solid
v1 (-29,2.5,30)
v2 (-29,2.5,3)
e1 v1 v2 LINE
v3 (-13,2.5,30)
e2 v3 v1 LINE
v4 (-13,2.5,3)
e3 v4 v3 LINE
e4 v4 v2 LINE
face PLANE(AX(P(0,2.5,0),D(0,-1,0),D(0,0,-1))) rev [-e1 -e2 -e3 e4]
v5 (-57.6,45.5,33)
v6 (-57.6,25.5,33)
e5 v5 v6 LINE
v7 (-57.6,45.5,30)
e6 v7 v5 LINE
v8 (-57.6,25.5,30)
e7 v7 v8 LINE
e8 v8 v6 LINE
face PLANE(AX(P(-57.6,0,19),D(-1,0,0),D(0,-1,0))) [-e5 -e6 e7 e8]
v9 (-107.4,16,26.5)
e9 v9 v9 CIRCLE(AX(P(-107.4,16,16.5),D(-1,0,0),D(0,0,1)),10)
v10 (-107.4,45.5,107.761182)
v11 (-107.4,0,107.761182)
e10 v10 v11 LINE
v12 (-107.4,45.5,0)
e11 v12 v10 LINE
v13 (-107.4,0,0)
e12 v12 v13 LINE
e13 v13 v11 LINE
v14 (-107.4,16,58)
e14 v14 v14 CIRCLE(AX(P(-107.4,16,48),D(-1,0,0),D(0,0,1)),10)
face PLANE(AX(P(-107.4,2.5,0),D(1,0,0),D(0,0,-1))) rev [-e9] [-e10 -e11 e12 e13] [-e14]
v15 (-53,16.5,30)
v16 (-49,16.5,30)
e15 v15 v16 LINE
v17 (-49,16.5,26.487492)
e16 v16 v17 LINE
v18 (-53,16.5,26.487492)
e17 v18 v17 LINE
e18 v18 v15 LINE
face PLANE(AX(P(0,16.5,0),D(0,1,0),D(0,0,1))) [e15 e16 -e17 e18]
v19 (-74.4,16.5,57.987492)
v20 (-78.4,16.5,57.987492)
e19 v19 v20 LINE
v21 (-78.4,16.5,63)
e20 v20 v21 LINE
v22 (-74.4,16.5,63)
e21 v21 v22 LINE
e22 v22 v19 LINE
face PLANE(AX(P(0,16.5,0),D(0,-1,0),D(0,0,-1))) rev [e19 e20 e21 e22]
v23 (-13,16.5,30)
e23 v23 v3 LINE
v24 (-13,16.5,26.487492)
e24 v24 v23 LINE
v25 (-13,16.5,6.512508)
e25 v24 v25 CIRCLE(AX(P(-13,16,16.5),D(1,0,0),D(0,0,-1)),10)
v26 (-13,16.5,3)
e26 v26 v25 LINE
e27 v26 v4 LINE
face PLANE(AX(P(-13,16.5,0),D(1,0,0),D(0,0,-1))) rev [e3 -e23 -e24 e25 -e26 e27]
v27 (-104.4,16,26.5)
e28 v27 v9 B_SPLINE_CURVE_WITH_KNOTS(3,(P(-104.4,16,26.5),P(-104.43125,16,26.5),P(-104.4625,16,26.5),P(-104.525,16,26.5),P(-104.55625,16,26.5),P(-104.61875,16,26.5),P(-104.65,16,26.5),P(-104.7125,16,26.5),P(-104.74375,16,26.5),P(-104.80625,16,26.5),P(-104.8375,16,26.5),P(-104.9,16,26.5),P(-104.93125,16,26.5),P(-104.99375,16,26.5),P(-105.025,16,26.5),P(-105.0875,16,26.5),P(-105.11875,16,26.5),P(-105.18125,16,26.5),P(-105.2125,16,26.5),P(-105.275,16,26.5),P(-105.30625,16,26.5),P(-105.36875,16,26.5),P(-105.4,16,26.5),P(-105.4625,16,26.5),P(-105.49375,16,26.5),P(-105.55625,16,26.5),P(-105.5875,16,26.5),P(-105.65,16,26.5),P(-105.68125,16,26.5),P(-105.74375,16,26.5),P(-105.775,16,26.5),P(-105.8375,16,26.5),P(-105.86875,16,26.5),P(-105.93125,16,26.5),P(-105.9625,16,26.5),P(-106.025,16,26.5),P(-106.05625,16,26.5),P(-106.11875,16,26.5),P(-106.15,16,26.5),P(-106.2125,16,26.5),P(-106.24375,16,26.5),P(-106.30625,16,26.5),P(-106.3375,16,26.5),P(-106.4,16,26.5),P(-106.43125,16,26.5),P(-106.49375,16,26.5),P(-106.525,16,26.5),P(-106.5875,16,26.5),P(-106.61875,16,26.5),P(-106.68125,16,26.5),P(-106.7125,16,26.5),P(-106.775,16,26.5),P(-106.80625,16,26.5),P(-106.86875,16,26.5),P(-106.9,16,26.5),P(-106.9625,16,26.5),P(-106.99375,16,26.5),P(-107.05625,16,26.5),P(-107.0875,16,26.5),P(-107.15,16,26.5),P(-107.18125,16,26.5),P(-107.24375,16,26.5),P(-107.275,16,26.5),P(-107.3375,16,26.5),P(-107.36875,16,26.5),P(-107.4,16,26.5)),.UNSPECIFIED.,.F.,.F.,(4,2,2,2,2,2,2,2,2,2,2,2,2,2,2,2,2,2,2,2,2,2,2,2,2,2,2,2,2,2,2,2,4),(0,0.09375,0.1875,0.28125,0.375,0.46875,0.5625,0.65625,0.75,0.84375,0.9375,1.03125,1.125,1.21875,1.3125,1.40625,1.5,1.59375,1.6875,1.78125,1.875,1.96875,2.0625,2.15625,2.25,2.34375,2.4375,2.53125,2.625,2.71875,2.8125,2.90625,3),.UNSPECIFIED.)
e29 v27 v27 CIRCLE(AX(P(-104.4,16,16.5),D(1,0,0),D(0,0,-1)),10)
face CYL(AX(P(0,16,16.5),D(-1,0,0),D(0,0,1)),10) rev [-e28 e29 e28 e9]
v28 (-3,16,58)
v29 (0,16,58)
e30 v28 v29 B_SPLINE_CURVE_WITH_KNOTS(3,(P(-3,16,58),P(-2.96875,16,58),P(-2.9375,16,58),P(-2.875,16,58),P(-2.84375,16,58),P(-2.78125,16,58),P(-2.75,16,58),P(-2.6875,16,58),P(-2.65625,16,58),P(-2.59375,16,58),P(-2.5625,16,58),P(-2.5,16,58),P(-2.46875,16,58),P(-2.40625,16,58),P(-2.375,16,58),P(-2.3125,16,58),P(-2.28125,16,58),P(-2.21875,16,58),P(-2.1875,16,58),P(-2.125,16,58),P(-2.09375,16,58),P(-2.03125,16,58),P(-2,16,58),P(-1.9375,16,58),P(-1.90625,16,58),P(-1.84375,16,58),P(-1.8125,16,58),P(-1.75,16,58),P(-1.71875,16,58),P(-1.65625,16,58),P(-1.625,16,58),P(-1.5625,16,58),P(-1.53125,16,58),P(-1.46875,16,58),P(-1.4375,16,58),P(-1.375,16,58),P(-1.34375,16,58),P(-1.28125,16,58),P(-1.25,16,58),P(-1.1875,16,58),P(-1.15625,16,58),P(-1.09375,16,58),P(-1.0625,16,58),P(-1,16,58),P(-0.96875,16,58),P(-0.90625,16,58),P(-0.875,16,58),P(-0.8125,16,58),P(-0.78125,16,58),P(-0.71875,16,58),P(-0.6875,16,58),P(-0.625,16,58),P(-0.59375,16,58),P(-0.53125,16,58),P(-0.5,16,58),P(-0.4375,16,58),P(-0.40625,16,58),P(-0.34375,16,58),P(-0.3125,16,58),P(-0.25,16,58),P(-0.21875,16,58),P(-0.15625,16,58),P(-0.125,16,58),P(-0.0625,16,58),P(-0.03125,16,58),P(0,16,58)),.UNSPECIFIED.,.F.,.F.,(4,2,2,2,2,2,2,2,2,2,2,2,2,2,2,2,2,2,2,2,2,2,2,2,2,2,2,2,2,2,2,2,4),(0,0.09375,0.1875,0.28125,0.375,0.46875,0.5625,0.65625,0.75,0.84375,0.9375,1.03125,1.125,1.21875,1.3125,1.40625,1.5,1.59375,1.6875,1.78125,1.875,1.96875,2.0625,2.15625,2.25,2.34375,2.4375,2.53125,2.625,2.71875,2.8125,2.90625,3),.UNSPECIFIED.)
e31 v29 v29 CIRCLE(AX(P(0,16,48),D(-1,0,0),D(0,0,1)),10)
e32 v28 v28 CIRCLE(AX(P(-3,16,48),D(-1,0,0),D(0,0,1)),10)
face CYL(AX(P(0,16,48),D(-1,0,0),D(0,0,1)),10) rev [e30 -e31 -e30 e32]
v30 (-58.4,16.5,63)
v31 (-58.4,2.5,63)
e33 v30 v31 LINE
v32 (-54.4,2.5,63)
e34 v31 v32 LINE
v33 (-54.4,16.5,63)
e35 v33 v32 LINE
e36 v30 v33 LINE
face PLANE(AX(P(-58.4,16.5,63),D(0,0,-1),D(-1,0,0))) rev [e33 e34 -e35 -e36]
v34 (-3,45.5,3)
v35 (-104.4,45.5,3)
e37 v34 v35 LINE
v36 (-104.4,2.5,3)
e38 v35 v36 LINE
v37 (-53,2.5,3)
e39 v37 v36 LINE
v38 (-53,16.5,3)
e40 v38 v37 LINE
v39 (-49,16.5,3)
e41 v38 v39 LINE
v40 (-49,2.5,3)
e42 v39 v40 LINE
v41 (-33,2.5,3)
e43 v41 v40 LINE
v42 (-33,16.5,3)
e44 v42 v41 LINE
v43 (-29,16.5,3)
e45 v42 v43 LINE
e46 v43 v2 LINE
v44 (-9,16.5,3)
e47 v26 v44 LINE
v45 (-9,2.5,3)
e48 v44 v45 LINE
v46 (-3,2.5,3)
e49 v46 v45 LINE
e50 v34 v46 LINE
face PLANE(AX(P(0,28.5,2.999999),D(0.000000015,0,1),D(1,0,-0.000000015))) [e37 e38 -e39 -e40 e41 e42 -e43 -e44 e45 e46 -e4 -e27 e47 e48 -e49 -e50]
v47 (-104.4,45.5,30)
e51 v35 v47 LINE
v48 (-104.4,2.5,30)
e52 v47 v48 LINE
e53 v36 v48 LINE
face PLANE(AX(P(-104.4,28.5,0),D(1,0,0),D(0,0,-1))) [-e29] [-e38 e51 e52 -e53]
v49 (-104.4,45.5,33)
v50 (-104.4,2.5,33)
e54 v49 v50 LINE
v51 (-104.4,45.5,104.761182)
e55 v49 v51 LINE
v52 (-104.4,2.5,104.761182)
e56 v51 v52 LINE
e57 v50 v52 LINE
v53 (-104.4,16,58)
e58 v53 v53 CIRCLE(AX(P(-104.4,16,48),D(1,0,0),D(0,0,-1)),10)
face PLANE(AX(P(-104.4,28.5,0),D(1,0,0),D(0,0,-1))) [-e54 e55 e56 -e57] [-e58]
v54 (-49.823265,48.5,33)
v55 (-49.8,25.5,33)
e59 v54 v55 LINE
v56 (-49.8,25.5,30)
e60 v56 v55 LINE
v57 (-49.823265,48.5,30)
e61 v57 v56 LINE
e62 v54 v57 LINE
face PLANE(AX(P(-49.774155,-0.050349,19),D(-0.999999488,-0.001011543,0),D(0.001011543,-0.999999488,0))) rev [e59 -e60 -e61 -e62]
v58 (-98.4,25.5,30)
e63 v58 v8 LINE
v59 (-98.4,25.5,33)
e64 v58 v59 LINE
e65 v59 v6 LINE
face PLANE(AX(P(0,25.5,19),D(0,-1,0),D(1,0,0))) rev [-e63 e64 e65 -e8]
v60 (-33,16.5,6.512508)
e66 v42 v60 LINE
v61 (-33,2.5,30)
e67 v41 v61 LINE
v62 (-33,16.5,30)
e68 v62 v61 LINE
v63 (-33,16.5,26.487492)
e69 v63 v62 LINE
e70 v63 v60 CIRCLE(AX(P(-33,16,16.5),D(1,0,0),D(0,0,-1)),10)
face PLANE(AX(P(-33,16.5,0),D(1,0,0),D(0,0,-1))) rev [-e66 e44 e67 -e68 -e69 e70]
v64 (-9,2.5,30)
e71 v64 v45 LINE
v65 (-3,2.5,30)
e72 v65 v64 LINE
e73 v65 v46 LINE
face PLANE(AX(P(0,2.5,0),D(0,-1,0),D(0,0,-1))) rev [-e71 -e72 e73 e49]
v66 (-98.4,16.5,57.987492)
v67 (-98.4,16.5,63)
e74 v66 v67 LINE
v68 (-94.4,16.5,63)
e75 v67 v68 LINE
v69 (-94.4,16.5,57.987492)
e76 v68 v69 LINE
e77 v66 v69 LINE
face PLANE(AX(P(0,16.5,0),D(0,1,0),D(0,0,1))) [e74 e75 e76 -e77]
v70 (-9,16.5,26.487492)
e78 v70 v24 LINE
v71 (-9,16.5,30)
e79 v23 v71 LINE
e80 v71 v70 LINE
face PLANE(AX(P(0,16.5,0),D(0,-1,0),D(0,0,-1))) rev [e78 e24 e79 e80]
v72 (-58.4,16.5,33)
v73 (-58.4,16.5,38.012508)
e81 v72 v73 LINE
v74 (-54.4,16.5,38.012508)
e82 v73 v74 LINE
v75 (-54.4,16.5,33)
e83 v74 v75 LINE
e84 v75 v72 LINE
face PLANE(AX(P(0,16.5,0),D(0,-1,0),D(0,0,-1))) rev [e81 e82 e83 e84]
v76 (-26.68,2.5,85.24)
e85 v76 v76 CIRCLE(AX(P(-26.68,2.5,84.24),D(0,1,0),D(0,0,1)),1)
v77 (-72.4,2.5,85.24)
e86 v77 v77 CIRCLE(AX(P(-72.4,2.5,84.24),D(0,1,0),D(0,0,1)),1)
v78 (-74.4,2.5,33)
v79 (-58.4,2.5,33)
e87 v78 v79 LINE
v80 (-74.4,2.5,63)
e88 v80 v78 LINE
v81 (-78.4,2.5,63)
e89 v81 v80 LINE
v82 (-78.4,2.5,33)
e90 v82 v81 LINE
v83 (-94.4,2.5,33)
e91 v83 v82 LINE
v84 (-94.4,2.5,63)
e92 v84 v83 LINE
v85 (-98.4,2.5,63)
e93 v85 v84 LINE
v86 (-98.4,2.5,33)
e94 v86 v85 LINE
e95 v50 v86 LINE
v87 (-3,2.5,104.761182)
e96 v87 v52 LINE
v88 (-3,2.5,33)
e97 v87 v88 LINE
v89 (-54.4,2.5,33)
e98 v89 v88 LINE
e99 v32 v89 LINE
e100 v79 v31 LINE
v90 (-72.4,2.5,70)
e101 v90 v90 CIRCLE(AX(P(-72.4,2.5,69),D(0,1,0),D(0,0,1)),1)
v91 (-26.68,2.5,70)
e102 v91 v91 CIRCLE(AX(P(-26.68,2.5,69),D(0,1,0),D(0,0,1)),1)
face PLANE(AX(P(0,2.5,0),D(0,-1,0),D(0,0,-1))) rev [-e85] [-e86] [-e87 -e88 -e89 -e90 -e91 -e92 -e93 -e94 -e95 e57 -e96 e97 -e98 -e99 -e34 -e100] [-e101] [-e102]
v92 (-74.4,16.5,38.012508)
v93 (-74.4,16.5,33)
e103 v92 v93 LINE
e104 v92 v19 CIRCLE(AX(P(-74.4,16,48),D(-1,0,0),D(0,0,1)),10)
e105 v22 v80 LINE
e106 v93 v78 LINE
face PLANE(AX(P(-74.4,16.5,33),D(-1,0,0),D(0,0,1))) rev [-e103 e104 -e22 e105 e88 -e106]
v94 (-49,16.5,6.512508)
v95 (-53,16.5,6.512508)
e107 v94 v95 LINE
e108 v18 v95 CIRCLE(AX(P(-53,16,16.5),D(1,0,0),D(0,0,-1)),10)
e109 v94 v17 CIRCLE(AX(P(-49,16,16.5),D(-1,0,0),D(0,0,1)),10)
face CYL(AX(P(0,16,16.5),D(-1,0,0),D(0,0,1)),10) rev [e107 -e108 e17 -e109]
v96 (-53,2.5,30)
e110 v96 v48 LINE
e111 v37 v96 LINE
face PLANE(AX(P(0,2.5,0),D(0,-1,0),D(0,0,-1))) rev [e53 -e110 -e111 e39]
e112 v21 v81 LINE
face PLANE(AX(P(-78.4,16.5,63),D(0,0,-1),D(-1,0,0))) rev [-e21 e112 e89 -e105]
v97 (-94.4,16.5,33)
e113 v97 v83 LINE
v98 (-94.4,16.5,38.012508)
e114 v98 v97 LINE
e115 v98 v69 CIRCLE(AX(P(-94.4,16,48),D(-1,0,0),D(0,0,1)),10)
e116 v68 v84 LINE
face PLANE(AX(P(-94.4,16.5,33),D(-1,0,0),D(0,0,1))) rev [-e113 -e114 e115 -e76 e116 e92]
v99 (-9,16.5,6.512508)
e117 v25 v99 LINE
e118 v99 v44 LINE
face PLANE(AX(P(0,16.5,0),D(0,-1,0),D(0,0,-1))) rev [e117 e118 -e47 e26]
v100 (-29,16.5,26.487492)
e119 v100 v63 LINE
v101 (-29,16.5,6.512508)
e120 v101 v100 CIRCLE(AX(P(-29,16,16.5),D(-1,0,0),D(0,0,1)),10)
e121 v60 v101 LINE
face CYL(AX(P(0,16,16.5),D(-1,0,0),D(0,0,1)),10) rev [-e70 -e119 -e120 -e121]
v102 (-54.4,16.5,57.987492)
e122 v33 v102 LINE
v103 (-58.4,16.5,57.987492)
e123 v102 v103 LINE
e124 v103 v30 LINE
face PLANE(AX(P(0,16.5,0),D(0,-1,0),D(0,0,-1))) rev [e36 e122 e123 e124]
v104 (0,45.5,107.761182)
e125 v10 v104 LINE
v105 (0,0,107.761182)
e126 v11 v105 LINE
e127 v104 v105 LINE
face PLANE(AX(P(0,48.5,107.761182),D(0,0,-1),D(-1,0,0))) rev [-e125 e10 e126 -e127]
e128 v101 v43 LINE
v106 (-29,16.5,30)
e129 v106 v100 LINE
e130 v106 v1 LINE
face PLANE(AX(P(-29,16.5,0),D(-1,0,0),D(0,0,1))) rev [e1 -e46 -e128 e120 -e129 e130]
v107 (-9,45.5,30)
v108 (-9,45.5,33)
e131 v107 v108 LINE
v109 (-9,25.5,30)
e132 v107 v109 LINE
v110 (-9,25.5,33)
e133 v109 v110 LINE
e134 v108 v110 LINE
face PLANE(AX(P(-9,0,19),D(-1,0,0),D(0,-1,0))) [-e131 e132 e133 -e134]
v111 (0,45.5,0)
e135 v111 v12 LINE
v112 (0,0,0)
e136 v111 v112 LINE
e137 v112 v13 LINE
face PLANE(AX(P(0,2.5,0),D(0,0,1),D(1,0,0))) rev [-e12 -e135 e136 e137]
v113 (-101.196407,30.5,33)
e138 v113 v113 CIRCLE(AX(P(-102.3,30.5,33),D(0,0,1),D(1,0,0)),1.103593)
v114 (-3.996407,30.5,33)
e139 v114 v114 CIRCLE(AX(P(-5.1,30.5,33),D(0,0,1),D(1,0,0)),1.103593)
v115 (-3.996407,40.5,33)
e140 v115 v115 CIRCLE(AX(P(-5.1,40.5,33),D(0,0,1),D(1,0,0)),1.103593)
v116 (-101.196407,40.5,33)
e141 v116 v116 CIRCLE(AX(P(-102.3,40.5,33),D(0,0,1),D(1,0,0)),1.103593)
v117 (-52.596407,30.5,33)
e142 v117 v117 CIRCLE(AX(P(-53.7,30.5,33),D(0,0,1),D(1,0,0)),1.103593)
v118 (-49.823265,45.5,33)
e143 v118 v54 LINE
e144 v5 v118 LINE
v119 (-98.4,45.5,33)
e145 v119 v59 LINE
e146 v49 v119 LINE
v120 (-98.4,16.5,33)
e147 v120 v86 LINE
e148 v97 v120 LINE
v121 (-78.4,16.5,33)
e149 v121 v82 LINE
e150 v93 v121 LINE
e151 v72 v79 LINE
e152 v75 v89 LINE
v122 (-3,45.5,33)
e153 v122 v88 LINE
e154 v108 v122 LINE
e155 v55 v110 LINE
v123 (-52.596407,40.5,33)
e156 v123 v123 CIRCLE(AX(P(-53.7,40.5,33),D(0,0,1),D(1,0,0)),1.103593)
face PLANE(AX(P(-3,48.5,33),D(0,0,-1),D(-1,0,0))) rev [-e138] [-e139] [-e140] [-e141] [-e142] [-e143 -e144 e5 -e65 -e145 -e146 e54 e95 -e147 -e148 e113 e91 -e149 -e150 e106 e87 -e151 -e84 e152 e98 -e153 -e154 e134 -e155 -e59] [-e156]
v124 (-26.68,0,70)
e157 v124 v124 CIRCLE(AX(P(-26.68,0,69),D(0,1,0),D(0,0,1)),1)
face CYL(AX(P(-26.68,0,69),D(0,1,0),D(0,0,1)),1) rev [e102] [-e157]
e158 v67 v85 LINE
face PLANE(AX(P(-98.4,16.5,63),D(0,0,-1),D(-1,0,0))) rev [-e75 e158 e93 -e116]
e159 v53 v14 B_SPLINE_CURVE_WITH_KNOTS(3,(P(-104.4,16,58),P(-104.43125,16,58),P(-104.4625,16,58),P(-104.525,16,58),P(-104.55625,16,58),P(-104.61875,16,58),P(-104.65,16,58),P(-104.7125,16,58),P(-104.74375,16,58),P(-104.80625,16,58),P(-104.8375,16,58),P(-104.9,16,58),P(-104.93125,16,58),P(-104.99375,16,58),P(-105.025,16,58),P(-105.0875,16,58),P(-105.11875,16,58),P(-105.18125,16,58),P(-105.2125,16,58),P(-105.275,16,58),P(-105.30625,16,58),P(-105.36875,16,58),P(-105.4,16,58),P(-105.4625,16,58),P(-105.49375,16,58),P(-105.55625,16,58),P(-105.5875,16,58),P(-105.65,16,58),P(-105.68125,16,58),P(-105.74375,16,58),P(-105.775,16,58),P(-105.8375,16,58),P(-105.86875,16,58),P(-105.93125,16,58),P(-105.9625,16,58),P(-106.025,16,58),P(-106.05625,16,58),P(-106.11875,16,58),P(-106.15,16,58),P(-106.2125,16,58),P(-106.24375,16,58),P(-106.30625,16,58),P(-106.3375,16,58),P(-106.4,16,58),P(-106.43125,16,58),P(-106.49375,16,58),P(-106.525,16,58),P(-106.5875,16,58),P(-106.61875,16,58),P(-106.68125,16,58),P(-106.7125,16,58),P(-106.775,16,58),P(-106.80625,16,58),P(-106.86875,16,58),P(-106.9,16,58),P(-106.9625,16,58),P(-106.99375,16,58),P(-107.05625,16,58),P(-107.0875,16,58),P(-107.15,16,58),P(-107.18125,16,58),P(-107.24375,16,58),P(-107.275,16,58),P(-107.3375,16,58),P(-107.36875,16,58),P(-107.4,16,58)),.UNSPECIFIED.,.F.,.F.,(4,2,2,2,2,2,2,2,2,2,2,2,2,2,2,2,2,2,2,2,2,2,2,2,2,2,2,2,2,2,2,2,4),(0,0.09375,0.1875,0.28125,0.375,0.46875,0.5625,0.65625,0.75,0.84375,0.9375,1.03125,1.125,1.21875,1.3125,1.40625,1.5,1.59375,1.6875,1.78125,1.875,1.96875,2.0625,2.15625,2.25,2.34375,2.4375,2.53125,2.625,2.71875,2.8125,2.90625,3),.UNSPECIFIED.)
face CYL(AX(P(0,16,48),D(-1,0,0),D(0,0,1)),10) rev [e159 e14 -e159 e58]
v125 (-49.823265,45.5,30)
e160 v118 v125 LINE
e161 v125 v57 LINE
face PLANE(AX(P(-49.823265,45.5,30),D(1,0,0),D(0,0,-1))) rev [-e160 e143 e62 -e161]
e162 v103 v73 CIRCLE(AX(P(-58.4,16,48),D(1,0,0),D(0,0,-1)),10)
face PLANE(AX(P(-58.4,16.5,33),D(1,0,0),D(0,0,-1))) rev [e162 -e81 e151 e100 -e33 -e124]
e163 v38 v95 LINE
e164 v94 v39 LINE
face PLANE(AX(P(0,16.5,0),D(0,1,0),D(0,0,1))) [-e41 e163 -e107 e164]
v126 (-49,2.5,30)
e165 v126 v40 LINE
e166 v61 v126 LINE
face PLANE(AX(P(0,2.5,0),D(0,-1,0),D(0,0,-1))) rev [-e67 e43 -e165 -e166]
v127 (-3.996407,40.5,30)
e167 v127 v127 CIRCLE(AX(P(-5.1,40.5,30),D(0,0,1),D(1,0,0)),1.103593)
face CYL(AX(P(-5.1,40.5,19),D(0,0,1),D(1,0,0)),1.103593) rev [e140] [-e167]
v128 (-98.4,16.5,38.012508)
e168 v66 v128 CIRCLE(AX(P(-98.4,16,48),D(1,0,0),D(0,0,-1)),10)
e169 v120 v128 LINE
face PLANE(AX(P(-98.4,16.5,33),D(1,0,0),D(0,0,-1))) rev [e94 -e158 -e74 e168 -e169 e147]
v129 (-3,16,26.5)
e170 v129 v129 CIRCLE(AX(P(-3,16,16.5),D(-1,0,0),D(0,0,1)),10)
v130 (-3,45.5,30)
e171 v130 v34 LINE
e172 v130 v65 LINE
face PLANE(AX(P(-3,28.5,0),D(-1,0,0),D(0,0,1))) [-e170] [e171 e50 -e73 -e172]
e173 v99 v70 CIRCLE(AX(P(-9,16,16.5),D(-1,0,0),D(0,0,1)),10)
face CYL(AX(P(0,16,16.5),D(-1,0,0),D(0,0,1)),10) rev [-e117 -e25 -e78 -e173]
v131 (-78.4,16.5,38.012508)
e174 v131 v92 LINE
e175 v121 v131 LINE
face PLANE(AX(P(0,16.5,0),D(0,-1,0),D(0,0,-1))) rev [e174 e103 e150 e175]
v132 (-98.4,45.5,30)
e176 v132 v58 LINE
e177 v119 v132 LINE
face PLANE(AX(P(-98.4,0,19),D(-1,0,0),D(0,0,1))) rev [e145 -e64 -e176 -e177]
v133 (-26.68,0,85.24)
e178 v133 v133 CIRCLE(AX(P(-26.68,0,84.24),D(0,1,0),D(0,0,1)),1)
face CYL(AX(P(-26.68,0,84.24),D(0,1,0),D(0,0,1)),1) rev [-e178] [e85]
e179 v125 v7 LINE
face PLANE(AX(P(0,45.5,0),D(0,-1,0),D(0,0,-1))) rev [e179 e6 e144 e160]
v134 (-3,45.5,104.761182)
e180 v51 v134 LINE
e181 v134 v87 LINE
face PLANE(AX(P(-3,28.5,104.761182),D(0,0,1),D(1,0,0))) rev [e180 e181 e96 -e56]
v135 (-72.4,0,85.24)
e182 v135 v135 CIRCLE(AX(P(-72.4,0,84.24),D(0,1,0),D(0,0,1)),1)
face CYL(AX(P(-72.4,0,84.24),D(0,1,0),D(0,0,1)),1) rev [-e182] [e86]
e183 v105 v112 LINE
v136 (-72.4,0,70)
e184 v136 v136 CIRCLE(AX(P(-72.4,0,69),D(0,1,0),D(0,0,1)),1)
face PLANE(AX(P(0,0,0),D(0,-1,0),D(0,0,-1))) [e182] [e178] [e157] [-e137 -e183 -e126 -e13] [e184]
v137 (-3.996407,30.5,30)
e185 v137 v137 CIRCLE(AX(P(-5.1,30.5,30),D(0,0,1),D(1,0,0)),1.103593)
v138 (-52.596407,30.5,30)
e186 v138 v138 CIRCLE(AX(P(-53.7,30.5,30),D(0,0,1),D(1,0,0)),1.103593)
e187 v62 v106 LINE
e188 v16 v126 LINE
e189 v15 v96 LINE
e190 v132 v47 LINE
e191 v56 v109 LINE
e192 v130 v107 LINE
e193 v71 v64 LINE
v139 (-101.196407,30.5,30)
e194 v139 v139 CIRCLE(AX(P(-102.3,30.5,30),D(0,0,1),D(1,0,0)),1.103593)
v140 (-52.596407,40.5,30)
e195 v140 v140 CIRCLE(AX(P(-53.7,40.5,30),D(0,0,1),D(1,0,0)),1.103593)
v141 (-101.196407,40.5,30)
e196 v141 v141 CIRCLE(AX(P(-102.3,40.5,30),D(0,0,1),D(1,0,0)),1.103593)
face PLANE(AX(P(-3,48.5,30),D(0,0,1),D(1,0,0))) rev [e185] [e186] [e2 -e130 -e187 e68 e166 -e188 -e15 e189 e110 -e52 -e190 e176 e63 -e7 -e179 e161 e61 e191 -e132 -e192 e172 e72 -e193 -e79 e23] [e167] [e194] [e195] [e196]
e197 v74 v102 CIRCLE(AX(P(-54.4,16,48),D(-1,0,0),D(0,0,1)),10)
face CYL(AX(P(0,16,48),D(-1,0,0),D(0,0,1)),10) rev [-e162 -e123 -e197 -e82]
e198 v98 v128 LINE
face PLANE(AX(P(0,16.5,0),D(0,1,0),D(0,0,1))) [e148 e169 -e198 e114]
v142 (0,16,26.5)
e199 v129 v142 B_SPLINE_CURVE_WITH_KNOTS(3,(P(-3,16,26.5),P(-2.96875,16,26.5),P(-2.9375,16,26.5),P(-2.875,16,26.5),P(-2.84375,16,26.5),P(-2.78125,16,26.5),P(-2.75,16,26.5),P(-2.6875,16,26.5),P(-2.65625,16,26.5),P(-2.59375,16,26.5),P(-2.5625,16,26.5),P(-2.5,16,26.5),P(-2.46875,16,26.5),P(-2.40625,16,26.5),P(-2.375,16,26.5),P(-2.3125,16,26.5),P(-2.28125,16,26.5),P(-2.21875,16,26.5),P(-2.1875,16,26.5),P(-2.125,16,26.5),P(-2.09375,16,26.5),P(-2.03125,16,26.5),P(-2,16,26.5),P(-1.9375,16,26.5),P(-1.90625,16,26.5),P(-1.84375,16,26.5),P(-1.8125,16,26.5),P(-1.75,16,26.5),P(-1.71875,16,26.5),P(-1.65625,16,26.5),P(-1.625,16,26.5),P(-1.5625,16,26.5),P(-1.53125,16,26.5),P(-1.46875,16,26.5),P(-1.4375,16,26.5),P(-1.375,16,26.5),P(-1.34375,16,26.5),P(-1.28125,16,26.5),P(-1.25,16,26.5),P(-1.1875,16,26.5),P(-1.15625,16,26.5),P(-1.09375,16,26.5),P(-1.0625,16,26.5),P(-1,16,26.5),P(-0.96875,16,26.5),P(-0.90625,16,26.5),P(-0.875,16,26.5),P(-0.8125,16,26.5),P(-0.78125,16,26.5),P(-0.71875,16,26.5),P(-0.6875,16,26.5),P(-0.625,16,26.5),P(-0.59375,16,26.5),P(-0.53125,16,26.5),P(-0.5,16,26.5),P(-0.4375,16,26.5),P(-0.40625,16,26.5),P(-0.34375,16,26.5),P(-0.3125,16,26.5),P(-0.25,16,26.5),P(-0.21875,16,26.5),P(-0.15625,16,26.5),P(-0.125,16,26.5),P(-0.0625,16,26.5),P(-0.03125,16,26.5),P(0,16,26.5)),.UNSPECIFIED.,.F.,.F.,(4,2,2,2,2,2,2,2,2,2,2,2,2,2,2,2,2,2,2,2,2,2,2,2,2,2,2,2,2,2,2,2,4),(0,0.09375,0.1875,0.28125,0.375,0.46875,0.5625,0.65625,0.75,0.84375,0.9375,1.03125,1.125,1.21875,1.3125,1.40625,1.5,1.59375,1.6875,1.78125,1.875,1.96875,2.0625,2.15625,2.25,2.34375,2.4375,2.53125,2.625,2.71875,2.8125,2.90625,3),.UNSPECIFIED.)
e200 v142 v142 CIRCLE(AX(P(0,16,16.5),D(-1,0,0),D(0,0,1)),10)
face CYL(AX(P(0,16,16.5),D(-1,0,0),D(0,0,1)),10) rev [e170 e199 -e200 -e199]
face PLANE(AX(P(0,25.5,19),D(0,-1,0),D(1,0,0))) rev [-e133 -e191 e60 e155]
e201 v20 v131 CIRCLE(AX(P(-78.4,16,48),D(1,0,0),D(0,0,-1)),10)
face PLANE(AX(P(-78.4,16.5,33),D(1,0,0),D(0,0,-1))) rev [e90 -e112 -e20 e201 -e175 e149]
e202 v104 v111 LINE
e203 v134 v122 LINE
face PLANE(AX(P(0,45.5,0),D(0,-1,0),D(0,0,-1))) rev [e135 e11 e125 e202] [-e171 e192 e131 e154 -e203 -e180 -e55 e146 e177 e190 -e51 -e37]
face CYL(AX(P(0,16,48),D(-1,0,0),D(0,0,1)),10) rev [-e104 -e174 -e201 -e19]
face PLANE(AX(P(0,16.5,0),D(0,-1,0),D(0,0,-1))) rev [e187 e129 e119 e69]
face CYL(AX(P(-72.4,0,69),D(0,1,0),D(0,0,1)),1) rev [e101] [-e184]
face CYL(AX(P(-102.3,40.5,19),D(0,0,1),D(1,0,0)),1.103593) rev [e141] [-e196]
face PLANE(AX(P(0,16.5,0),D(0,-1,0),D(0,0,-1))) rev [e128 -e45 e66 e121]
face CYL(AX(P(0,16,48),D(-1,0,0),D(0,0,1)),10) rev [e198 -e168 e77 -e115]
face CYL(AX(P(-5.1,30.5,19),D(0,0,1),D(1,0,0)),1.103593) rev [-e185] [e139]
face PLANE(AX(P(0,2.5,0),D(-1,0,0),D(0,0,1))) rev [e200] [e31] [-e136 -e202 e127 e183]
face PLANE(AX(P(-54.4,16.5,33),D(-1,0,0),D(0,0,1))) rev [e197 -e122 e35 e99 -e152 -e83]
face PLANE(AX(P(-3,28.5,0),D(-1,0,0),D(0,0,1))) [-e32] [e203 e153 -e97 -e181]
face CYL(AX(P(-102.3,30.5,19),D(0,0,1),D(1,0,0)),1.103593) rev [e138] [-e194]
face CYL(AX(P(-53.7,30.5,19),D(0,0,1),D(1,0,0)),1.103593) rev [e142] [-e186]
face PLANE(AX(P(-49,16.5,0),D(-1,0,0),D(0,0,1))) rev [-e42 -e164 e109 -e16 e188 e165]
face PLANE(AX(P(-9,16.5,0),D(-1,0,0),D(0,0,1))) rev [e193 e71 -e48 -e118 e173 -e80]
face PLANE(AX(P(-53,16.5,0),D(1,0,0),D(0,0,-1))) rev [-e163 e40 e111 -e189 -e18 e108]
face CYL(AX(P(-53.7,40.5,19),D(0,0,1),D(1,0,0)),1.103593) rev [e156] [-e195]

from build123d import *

# Parameters (mm, degrees)
SKETCH3_W           = 107.4
SKETCH3_H           = 136.761182254
BOSS_EXTRUDE2_DEPTH = 2.5
SKETCH4_W           = 4
SKETCH4_H           = 30
BOSS_EXTRUDE3_DEPTH = 14
BOSS_EXTRUDE5_DEPTH = 26
SKETCH8_R           = 1
CUT_EXTRUDE3_DEPTH  = 176.824858798
SKETCH10_W          = 101.4
SKETCH10_H          = 3
BOSS_EXTRUDE6_DEPTH = 46
SKETCH14_W          = 107.4
SKETCH14_H          = 29
CUT_EXTRUDE7_DEPTH  = 181.528753863
SKETCH15_W          = 40.8
SKETCH15_H          = 23
SKETCH15_R          = 1.103593158
CUT_EXTRUDE11_DEPTH = 14
SKETCH17_R          = 10
CUT_EXTRUDE12_DEPTH = 160.685573552
SKETCH18_W          = 101.4
SKETCH18_H          = 3
BOSS_EXTRUDE7_DEPTH = 26
SKETCH19_W          = 4
SKETCH19_H          = 3
SKETCH19_H_2        = 3.000000485
BOSS_EXTRUDE8_DEPTH = 12
SKETCH20_W          = 6
SKETCH20_H          = 3
SKETCH20_W_2        = 7.776734501
CUT_EXTRUDE13_DEPTH = 3
SKETCH21_W          = 107.4
SKETCH21_H          = 107.761182254
SKETCH21_W_2        = 101.4
SKETCH21_H_2        = 101.761182254
BOSS_EXTRUDE9_DEPTH = 17


with BuildPart() as part:
    # Sketch3 → Boss-Extrude2 (new body)
    with BuildSketch(Plane(origin=(0, 0, 0), x_dir=(1, 0, 0), z_dir=(0, 1, 0))):
        with Locations((-53.7, -68.380591127)):
            Rectangle(SKETCH3_W, SKETCH3_H)
    extrude(amount=BOSS_EXTRUDE2_DEPTH)

    # Sketch4 → Boss-Extrude3 (add)
    with BuildSketch(Plane(origin=(0, 2.5, 0), x_dir=(1, 0, 0), z_dir=(0, 1, 0))):
        with Locations((-31, -14.999999758)):
            Rectangle(SKETCH4_W, SKETCH4_H)
        with Locations((-51, -15)):
            Rectangle(SKETCH4_W, SKETCH4_H)
        with Locations((-11, -14.999999515)):
            Rectangle(SKETCH4_W, SKETCH4_H)
        with Locations((-76.4, -48.000000242)):
            Rectangle(SKETCH4_W, SKETCH4_H)
        with Locations((-96.4, -48.000000485)):
            Rectangle(SKETCH4_W, SKETCH4_H)
        with Locations((-56.4, -48)):
            Rectangle(SKETCH4_W, SKETCH4_H)
    extrude(amount=BOSS_EXTRUDE3_DEPTH)

    # Sketch7 → Boss-Extrude5 (add)
    with BuildSketch(Plane(origin=(0, 2.5, 0), x_dir=(1, 0, 0), z_dir=(0, 1, 0))):
        Polygon((-9, -3), (-3, -3), (-3, -133.761182254), (-104.4, -133.761182254), (-104.4, -3), (-53, -3), (-53, 0), (-107.4, 0), (-107.4, -136.761182254), (0, -136.761182254), (0, 0), (-9, 0), align=None)
        Polygon((-28.999999909, -3), (-12.999999909, -2.999999515), (-13, 4.85e-07), (-29, 0), align=None)
        Polygon((-48.999999955, -3), (-32.999999955, -2.999999758), (-33, 2.42e-07), (-49, 0), align=None)
    extrude(amount=BOSS_EXTRUDE5_DEPTH)

    # Sketch8 → Cut-Extrude3 (cut, through all)
    with BuildSketch(Plane(origin=(0, 2.5, 0), x_dir=(1, 0, 0), z_dir=(0, 1, 0))):
        with Locations((-72.4, -69.000000485)):
            Circle(SKETCH8_R)
        with Locations((-26.68, -69.000000485)):
            Circle(SKETCH8_R)
        with Locations((-26.68, -84.240000485)):
            Circle(SKETCH8_R)
        with Locations((-72.4, -84.240000485)):
            Circle(SKETCH8_R)
    extrude(amount=-CUT_EXTRUDE3_DEPTH, mode=Mode.SUBTRACT)


with BuildPart() as boss_extrude6_tool:
    # Sketch10 → Boss-Extrude6 (new body)
    with BuildSketch(Plane(origin=(0, 2.5, 0), x_dir=(1, 0, 0), z_dir=(0, 1, 0))):
        with Locations((-53.7, -31.499999515)):
            Rectangle(SKETCH10_W, SKETCH10_H)
    extrude(amount=BOSS_EXTRUDE6_DEPTH)


with BuildPart() as part_1:
    add(part.part)


with BuildPart() as part_2:
    # Boss-Extrude6: joined with boss_extrude6_tool
    add(part_1.part.fuse(boss_extrude6_tool.part, tol=0.00001))

    # Sketch14 → Cut-Extrude7 (cut, through all)
    with BuildSketch(Plane.XZ):
        with Locations((-53.7, 122.261182254)):
            Rectangle(SKETCH14_W, SKETCH14_H)
    extrude(amount=-CUT_EXTRUDE7_DEPTH, mode=Mode.SUBTRACT)

    # Sketch15 → Cut-Extrude11 (cut)
    with BuildSketch(Plane.XY.offset(32.999999515)):
        with Locations((-78, 37)):
            Rectangle(SKETCH15_W, SKETCH15_H)
        Polygon((-49.823265499, 48.5), (-49.8, 25.5), (-9, 25.5), (-9, 48.5), align=None)
        with Locations((-102.3, 30.5)):
            Circle(SKETCH15_R)
        with Locations((-102.3, 40.5)):
            Circle(SKETCH15_R)
        with Locations((-53.7, 30.5)):
            Circle(SKETCH15_R)
        with Locations((-53.7, 40.5)):
            Circle(SKETCH15_R)
        with Locations((-5.1, 40.5)):
            Circle(SKETCH15_R)
        with Locations((-5.1, 30.5)):
            Circle(SKETCH15_R)
    extrude(amount=-CUT_EXTRUDE11_DEPTH, mode=Mode.SUBTRACT)

    # Sketch17 → Cut-Extrude12 (cut, through all)
    with BuildSketch(Plane.ZY.offset(107.4)):
        with Locations((16.5, 16)):
            Circle(SKETCH17_R)
        with Locations((48, 16)):
            Circle(SKETCH17_R)
    extrude(amount=-CUT_EXTRUDE12_DEPTH, mode=Mode.SUBTRACT)

    # Sketch18 → Boss-Extrude7 (add)
    with BuildSketch(Plane(origin=(0, 2.5, 0), x_dir=(1, 0, 0), z_dir=(0, 1, 0))):
        with Locations((-53.7, -106.261182254)):
            Rectangle(SKETCH18_W, SKETCH18_H)
    extrude(amount=BOSS_EXTRUDE7_DEPTH)

    # Sketch19 → Boss-Extrude8 (add)
    with BuildSketch(Plane(origin=(0, 16.5, 0), x_dir=(1, 0, 0), z_dir=(0, 1, 0))):
        with Locations((-51, -1.5)):
            Rectangle(SKETCH19_W, SKETCH19_H)
        with Locations((-31, -1.5)):
            Rectangle(SKETCH19_W, SKETCH19_H)
        with Locations((-11, -1.499999757)):
            Rectangle(SKETCH19_W, SKETCH19_H_2)
    extrude(amount=BOSS_EXTRUDE8_DEPTH)

    # Sketch20 → Cut-Extrude13 (cut)
    with BuildSketch(Plane(origin=(0, 48.5, 0), x_dir=(1, 0, 0), z_dir=(0, 1, 0))):
        with Locations((-6, -31.499999515)):
            Rectangle(SKETCH20_W, SKETCH20_H)
        with Locations((-53.711632749, -31.499999515)):
            Rectangle(SKETCH20_W_2, SKETCH20_H)
        with Locations((-101.4, -31.499999515)):
            Rectangle(SKETCH20_W, SKETCH20_H)
    extrude(amount=-CUT_EXTRUDE13_DEPTH, mode=Mode.SUBTRACT)

    # Sketch21 → Boss-Extrude9 (add)
    with BuildSketch(Plane(origin=(0, 28.5, 0), x_dir=(1, 0, 0), z_dir=(0, 1, 0))):
        with Locations((-53.7, -53.880591127)):
            Rectangle(SKETCH21_W, SKETCH21_H)
        with Locations((-53.7, -53.880591127)):
            Rectangle(SKETCH21_W_2, SKETCH21_H_2, mode=Mode.SUBTRACT)
    extrude(amount=BOSS_EXTRUDE9_DEPTH)


solid = part_2.part
